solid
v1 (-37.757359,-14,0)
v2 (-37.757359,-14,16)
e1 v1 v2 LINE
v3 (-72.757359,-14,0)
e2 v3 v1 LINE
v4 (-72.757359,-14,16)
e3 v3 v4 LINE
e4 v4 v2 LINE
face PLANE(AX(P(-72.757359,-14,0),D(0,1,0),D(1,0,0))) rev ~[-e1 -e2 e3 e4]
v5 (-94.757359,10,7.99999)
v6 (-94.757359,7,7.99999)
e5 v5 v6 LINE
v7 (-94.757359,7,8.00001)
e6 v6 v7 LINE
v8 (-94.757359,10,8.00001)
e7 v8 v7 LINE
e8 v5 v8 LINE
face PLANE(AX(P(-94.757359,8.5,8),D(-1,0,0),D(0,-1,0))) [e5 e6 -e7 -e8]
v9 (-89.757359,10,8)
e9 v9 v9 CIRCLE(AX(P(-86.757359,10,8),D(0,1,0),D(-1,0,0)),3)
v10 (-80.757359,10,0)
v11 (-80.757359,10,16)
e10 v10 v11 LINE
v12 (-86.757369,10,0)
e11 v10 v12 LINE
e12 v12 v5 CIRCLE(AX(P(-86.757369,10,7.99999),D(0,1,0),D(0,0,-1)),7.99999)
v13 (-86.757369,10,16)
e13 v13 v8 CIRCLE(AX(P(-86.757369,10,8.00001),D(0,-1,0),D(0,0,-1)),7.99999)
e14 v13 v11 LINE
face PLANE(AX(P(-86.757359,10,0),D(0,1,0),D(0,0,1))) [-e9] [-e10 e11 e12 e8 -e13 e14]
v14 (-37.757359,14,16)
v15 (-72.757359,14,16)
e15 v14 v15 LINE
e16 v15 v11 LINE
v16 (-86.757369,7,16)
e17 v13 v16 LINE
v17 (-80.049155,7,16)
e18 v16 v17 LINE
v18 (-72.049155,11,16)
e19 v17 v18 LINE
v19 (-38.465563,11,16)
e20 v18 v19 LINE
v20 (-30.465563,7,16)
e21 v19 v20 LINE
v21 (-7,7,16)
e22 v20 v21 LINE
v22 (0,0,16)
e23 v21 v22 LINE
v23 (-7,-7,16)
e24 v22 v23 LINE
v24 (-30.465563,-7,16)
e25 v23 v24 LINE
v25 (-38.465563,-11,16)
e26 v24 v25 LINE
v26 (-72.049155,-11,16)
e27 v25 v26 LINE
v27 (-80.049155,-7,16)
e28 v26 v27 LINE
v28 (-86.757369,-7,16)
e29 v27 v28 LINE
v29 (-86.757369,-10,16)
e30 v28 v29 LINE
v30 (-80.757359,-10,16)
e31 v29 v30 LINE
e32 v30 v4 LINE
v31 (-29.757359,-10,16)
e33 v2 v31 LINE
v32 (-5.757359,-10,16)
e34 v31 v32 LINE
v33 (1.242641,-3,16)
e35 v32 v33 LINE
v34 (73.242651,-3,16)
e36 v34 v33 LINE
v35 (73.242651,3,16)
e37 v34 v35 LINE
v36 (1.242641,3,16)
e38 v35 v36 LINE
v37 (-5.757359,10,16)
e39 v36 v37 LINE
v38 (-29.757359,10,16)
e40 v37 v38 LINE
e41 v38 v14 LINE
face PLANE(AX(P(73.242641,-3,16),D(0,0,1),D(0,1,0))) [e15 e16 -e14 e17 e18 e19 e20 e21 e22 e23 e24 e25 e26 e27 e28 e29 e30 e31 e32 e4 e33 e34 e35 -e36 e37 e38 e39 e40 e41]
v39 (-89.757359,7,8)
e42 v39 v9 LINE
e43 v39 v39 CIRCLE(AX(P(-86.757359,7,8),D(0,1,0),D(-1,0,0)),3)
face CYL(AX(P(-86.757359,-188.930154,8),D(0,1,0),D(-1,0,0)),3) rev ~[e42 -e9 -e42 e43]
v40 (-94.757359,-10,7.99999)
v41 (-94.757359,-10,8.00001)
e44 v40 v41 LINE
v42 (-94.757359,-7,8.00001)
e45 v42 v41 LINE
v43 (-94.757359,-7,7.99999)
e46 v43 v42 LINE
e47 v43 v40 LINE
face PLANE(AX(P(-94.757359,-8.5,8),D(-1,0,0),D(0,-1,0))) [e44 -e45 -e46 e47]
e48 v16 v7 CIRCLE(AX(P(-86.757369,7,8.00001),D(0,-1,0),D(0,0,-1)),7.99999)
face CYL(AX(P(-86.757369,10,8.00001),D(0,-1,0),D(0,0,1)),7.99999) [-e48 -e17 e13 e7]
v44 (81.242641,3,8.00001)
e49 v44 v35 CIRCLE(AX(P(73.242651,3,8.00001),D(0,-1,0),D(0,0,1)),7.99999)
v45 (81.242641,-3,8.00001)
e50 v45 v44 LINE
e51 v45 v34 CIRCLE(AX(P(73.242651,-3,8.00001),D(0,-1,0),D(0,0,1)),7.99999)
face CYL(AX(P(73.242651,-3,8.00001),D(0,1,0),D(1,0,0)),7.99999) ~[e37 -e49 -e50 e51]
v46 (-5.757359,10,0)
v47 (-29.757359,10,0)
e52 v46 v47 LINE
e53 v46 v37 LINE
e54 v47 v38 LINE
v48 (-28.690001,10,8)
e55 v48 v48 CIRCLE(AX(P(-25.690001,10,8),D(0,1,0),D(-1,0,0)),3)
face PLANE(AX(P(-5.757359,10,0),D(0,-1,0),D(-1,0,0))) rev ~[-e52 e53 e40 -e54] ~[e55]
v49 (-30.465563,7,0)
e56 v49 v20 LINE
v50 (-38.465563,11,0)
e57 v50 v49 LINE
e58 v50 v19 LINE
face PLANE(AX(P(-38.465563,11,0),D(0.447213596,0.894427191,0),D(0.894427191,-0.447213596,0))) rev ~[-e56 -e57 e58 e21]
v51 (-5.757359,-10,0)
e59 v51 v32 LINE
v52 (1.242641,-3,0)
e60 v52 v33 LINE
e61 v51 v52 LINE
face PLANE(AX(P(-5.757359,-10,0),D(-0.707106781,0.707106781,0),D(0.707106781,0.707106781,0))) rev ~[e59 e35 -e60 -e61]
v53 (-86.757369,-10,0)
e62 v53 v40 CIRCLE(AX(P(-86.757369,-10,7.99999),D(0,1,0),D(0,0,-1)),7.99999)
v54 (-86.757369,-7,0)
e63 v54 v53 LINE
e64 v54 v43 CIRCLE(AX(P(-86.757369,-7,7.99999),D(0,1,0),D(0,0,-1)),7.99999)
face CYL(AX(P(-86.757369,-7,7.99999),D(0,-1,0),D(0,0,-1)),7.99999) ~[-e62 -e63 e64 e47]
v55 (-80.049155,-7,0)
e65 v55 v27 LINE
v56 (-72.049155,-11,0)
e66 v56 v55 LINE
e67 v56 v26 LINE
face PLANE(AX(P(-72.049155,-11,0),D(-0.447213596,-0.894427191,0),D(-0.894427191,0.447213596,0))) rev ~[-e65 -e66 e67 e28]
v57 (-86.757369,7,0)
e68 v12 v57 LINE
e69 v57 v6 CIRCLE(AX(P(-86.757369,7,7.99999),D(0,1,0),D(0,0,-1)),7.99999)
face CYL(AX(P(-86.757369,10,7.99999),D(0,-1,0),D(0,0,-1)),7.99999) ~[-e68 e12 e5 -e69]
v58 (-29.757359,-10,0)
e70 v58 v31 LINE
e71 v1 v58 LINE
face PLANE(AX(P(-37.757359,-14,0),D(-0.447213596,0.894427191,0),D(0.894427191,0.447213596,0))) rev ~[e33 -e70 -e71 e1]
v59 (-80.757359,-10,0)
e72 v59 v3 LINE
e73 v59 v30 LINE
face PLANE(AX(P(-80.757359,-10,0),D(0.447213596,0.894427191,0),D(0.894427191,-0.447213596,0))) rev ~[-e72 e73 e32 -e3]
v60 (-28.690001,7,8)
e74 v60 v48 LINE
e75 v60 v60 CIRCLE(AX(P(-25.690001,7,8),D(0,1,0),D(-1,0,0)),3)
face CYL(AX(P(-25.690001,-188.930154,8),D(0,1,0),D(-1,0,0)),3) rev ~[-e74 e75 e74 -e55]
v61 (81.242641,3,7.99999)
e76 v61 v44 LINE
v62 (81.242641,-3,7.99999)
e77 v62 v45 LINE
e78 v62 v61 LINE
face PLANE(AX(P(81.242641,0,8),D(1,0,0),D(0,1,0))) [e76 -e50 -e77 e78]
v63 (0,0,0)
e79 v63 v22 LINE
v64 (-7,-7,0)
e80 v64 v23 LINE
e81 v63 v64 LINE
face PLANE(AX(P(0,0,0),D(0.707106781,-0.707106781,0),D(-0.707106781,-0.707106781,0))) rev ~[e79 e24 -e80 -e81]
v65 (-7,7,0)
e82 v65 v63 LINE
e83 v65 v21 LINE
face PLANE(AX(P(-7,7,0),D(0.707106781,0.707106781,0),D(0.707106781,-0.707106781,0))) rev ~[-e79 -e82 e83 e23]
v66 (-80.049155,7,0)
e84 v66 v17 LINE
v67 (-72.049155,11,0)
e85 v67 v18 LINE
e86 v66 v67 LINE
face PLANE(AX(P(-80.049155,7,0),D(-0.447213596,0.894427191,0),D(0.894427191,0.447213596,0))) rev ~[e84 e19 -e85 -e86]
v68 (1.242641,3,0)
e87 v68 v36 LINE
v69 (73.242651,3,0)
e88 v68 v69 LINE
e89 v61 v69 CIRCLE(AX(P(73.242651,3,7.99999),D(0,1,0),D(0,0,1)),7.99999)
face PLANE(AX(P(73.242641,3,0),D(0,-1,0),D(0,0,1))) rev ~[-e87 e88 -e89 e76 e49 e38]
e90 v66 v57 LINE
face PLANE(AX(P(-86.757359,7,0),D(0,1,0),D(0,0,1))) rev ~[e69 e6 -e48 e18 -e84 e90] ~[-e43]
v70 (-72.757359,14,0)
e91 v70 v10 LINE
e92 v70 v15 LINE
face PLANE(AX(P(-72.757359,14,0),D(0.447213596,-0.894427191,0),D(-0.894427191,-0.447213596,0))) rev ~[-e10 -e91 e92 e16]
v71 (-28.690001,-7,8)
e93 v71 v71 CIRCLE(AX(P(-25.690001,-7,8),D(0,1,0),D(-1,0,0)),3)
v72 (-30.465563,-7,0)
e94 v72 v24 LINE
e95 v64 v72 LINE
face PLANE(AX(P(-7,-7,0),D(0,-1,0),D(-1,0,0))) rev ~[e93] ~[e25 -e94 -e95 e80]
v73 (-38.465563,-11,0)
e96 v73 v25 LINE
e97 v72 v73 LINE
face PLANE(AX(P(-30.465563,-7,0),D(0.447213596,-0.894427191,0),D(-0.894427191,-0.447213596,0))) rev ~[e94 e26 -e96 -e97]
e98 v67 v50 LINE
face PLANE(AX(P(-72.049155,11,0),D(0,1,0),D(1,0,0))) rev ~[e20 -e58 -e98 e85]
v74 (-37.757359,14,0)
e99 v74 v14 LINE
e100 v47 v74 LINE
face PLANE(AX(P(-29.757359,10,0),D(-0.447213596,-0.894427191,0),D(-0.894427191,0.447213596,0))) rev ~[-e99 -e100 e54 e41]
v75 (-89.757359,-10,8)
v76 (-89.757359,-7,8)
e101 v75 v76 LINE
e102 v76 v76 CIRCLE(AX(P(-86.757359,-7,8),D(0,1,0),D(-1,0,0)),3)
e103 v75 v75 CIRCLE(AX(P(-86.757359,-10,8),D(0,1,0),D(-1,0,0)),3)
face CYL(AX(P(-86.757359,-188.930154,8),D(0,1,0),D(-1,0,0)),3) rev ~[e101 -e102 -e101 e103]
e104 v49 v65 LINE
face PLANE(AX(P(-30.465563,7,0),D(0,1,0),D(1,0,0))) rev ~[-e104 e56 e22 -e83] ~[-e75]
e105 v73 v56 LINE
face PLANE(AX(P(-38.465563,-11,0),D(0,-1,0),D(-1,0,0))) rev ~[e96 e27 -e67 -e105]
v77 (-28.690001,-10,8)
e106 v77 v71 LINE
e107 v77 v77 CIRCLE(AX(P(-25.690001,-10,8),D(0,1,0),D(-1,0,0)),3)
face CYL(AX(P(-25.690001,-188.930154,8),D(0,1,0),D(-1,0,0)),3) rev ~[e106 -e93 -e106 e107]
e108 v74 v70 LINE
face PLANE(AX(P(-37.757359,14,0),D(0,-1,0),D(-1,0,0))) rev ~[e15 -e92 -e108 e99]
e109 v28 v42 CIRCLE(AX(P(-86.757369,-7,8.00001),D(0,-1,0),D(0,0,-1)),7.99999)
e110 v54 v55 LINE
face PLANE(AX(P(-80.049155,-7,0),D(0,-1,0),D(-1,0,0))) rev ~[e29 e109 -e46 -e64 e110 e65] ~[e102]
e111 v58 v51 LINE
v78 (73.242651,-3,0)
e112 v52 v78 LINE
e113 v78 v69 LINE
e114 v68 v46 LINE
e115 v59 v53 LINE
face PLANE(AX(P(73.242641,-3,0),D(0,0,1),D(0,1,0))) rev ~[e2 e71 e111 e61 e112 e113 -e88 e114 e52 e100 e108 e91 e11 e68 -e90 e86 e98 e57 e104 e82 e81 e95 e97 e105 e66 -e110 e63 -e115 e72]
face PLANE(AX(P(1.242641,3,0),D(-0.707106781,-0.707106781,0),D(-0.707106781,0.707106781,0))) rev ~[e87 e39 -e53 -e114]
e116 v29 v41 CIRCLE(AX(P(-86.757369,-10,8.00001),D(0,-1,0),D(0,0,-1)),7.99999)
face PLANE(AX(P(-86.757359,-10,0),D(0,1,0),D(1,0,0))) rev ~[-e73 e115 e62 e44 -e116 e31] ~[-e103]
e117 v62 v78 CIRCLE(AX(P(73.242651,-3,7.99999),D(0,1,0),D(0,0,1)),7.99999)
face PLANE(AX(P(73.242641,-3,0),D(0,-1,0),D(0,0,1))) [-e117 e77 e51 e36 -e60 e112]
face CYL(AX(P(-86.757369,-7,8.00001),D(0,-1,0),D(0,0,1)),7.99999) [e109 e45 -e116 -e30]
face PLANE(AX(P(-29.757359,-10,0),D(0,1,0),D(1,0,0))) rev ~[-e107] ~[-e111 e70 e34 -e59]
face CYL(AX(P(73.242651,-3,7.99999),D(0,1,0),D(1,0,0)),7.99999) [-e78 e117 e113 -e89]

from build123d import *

# Parameters (mm, degrees)
F1_DEPTH = 16
F3_W     = 3
F3_H     = 16
F5_DEPTH = 8
F4_W     = 6
F4_H     = 16
F6_DEPTH = 8
F7_D     = 6
F8_R     = 7.99999


# Not quite as in the source:
# - a fillet or chamfer is up to 0.001 mm smaller than in the source, because OpenCascade refuses the exact size


with BuildPart() as f1:
    # F0 (on Top) → F1 (new body)
    with BuildSketch(Plane.XY):
        Polygon((-80.7573593129, 10), (-86.7573593129, 10), (-86.7573593129, 7), (-80.0491553804, 7), (-72.0491553804, 11), (-38.4655632454, 11), (-30.4655632454, 7), (-7, 7), (0, 0), (-7, -7), (-30.4655632454, -7), (-38.4655632454, -11), (-72.0491553804, -11), (-80.0491553804, -7), (-86.7573593129, -7), (-86.7573593129, -10), (-80.7573593129, -10), (-72.7573593129, -14), (-37.7573593129, -14), (-29.7573593129, -10), (-5.7573593129, -10), (1.2426406871, -3), (73.2426406871, -3), (73.2426406871, 3), (1.2426406871, 3), (-5.7573593129, 10), (-29.7573593129, 10), (-37.7573593129, 14), (-72.7573593129, 14), align=None)
    extrude(amount=F1_DEPTH)

    # F3 (on face) → F5 (join)
    with BuildSketch(Plane(origin=(-86.7573593129, 0, 0), x_dir=(0, -1, 0), z_dir=(-1, 0, 0))):
        with Locations((-8.5, 8)):
            Rectangle(F3_W, F3_H)
        with Locations((8.5, 8)):
            Rectangle(F3_W, F3_H)
    extrude(amount=F5_DEPTH)

    # F4 (on face) → F6 (join)
    with BuildSketch(Plane.YZ.offset(73.2426406871)):
        with Locations((0, 8)):
            Rectangle(F4_W, F4_H)
    extrude(amount=F6_DEPTH)

    # F7 (through all)
    with Locations(Plane.XZ.offset(10)):
        with Locations((-86.7573593129, 8), (-25.6900005043, 8)):
            Hole(F7_D / 2)

    # F8 (radius 8 in the source; OpenCascade refuses exactly that, so slightly less here)
    f8_edges = [f1.edges().sort_by_distance(p)[0] for p in [
        (-94.757359, -8.5, 16),
        (-94.757359, -8.5, 0),
        (-94.757359, 8.5, 0),
        (-94.757359, 8.5, 16),
        (81.242641, 0, 16),
        (81.242641, 0, 0),
    ]]
    fillet(f8_edges, radius=F8_R)


solid = f1.part
